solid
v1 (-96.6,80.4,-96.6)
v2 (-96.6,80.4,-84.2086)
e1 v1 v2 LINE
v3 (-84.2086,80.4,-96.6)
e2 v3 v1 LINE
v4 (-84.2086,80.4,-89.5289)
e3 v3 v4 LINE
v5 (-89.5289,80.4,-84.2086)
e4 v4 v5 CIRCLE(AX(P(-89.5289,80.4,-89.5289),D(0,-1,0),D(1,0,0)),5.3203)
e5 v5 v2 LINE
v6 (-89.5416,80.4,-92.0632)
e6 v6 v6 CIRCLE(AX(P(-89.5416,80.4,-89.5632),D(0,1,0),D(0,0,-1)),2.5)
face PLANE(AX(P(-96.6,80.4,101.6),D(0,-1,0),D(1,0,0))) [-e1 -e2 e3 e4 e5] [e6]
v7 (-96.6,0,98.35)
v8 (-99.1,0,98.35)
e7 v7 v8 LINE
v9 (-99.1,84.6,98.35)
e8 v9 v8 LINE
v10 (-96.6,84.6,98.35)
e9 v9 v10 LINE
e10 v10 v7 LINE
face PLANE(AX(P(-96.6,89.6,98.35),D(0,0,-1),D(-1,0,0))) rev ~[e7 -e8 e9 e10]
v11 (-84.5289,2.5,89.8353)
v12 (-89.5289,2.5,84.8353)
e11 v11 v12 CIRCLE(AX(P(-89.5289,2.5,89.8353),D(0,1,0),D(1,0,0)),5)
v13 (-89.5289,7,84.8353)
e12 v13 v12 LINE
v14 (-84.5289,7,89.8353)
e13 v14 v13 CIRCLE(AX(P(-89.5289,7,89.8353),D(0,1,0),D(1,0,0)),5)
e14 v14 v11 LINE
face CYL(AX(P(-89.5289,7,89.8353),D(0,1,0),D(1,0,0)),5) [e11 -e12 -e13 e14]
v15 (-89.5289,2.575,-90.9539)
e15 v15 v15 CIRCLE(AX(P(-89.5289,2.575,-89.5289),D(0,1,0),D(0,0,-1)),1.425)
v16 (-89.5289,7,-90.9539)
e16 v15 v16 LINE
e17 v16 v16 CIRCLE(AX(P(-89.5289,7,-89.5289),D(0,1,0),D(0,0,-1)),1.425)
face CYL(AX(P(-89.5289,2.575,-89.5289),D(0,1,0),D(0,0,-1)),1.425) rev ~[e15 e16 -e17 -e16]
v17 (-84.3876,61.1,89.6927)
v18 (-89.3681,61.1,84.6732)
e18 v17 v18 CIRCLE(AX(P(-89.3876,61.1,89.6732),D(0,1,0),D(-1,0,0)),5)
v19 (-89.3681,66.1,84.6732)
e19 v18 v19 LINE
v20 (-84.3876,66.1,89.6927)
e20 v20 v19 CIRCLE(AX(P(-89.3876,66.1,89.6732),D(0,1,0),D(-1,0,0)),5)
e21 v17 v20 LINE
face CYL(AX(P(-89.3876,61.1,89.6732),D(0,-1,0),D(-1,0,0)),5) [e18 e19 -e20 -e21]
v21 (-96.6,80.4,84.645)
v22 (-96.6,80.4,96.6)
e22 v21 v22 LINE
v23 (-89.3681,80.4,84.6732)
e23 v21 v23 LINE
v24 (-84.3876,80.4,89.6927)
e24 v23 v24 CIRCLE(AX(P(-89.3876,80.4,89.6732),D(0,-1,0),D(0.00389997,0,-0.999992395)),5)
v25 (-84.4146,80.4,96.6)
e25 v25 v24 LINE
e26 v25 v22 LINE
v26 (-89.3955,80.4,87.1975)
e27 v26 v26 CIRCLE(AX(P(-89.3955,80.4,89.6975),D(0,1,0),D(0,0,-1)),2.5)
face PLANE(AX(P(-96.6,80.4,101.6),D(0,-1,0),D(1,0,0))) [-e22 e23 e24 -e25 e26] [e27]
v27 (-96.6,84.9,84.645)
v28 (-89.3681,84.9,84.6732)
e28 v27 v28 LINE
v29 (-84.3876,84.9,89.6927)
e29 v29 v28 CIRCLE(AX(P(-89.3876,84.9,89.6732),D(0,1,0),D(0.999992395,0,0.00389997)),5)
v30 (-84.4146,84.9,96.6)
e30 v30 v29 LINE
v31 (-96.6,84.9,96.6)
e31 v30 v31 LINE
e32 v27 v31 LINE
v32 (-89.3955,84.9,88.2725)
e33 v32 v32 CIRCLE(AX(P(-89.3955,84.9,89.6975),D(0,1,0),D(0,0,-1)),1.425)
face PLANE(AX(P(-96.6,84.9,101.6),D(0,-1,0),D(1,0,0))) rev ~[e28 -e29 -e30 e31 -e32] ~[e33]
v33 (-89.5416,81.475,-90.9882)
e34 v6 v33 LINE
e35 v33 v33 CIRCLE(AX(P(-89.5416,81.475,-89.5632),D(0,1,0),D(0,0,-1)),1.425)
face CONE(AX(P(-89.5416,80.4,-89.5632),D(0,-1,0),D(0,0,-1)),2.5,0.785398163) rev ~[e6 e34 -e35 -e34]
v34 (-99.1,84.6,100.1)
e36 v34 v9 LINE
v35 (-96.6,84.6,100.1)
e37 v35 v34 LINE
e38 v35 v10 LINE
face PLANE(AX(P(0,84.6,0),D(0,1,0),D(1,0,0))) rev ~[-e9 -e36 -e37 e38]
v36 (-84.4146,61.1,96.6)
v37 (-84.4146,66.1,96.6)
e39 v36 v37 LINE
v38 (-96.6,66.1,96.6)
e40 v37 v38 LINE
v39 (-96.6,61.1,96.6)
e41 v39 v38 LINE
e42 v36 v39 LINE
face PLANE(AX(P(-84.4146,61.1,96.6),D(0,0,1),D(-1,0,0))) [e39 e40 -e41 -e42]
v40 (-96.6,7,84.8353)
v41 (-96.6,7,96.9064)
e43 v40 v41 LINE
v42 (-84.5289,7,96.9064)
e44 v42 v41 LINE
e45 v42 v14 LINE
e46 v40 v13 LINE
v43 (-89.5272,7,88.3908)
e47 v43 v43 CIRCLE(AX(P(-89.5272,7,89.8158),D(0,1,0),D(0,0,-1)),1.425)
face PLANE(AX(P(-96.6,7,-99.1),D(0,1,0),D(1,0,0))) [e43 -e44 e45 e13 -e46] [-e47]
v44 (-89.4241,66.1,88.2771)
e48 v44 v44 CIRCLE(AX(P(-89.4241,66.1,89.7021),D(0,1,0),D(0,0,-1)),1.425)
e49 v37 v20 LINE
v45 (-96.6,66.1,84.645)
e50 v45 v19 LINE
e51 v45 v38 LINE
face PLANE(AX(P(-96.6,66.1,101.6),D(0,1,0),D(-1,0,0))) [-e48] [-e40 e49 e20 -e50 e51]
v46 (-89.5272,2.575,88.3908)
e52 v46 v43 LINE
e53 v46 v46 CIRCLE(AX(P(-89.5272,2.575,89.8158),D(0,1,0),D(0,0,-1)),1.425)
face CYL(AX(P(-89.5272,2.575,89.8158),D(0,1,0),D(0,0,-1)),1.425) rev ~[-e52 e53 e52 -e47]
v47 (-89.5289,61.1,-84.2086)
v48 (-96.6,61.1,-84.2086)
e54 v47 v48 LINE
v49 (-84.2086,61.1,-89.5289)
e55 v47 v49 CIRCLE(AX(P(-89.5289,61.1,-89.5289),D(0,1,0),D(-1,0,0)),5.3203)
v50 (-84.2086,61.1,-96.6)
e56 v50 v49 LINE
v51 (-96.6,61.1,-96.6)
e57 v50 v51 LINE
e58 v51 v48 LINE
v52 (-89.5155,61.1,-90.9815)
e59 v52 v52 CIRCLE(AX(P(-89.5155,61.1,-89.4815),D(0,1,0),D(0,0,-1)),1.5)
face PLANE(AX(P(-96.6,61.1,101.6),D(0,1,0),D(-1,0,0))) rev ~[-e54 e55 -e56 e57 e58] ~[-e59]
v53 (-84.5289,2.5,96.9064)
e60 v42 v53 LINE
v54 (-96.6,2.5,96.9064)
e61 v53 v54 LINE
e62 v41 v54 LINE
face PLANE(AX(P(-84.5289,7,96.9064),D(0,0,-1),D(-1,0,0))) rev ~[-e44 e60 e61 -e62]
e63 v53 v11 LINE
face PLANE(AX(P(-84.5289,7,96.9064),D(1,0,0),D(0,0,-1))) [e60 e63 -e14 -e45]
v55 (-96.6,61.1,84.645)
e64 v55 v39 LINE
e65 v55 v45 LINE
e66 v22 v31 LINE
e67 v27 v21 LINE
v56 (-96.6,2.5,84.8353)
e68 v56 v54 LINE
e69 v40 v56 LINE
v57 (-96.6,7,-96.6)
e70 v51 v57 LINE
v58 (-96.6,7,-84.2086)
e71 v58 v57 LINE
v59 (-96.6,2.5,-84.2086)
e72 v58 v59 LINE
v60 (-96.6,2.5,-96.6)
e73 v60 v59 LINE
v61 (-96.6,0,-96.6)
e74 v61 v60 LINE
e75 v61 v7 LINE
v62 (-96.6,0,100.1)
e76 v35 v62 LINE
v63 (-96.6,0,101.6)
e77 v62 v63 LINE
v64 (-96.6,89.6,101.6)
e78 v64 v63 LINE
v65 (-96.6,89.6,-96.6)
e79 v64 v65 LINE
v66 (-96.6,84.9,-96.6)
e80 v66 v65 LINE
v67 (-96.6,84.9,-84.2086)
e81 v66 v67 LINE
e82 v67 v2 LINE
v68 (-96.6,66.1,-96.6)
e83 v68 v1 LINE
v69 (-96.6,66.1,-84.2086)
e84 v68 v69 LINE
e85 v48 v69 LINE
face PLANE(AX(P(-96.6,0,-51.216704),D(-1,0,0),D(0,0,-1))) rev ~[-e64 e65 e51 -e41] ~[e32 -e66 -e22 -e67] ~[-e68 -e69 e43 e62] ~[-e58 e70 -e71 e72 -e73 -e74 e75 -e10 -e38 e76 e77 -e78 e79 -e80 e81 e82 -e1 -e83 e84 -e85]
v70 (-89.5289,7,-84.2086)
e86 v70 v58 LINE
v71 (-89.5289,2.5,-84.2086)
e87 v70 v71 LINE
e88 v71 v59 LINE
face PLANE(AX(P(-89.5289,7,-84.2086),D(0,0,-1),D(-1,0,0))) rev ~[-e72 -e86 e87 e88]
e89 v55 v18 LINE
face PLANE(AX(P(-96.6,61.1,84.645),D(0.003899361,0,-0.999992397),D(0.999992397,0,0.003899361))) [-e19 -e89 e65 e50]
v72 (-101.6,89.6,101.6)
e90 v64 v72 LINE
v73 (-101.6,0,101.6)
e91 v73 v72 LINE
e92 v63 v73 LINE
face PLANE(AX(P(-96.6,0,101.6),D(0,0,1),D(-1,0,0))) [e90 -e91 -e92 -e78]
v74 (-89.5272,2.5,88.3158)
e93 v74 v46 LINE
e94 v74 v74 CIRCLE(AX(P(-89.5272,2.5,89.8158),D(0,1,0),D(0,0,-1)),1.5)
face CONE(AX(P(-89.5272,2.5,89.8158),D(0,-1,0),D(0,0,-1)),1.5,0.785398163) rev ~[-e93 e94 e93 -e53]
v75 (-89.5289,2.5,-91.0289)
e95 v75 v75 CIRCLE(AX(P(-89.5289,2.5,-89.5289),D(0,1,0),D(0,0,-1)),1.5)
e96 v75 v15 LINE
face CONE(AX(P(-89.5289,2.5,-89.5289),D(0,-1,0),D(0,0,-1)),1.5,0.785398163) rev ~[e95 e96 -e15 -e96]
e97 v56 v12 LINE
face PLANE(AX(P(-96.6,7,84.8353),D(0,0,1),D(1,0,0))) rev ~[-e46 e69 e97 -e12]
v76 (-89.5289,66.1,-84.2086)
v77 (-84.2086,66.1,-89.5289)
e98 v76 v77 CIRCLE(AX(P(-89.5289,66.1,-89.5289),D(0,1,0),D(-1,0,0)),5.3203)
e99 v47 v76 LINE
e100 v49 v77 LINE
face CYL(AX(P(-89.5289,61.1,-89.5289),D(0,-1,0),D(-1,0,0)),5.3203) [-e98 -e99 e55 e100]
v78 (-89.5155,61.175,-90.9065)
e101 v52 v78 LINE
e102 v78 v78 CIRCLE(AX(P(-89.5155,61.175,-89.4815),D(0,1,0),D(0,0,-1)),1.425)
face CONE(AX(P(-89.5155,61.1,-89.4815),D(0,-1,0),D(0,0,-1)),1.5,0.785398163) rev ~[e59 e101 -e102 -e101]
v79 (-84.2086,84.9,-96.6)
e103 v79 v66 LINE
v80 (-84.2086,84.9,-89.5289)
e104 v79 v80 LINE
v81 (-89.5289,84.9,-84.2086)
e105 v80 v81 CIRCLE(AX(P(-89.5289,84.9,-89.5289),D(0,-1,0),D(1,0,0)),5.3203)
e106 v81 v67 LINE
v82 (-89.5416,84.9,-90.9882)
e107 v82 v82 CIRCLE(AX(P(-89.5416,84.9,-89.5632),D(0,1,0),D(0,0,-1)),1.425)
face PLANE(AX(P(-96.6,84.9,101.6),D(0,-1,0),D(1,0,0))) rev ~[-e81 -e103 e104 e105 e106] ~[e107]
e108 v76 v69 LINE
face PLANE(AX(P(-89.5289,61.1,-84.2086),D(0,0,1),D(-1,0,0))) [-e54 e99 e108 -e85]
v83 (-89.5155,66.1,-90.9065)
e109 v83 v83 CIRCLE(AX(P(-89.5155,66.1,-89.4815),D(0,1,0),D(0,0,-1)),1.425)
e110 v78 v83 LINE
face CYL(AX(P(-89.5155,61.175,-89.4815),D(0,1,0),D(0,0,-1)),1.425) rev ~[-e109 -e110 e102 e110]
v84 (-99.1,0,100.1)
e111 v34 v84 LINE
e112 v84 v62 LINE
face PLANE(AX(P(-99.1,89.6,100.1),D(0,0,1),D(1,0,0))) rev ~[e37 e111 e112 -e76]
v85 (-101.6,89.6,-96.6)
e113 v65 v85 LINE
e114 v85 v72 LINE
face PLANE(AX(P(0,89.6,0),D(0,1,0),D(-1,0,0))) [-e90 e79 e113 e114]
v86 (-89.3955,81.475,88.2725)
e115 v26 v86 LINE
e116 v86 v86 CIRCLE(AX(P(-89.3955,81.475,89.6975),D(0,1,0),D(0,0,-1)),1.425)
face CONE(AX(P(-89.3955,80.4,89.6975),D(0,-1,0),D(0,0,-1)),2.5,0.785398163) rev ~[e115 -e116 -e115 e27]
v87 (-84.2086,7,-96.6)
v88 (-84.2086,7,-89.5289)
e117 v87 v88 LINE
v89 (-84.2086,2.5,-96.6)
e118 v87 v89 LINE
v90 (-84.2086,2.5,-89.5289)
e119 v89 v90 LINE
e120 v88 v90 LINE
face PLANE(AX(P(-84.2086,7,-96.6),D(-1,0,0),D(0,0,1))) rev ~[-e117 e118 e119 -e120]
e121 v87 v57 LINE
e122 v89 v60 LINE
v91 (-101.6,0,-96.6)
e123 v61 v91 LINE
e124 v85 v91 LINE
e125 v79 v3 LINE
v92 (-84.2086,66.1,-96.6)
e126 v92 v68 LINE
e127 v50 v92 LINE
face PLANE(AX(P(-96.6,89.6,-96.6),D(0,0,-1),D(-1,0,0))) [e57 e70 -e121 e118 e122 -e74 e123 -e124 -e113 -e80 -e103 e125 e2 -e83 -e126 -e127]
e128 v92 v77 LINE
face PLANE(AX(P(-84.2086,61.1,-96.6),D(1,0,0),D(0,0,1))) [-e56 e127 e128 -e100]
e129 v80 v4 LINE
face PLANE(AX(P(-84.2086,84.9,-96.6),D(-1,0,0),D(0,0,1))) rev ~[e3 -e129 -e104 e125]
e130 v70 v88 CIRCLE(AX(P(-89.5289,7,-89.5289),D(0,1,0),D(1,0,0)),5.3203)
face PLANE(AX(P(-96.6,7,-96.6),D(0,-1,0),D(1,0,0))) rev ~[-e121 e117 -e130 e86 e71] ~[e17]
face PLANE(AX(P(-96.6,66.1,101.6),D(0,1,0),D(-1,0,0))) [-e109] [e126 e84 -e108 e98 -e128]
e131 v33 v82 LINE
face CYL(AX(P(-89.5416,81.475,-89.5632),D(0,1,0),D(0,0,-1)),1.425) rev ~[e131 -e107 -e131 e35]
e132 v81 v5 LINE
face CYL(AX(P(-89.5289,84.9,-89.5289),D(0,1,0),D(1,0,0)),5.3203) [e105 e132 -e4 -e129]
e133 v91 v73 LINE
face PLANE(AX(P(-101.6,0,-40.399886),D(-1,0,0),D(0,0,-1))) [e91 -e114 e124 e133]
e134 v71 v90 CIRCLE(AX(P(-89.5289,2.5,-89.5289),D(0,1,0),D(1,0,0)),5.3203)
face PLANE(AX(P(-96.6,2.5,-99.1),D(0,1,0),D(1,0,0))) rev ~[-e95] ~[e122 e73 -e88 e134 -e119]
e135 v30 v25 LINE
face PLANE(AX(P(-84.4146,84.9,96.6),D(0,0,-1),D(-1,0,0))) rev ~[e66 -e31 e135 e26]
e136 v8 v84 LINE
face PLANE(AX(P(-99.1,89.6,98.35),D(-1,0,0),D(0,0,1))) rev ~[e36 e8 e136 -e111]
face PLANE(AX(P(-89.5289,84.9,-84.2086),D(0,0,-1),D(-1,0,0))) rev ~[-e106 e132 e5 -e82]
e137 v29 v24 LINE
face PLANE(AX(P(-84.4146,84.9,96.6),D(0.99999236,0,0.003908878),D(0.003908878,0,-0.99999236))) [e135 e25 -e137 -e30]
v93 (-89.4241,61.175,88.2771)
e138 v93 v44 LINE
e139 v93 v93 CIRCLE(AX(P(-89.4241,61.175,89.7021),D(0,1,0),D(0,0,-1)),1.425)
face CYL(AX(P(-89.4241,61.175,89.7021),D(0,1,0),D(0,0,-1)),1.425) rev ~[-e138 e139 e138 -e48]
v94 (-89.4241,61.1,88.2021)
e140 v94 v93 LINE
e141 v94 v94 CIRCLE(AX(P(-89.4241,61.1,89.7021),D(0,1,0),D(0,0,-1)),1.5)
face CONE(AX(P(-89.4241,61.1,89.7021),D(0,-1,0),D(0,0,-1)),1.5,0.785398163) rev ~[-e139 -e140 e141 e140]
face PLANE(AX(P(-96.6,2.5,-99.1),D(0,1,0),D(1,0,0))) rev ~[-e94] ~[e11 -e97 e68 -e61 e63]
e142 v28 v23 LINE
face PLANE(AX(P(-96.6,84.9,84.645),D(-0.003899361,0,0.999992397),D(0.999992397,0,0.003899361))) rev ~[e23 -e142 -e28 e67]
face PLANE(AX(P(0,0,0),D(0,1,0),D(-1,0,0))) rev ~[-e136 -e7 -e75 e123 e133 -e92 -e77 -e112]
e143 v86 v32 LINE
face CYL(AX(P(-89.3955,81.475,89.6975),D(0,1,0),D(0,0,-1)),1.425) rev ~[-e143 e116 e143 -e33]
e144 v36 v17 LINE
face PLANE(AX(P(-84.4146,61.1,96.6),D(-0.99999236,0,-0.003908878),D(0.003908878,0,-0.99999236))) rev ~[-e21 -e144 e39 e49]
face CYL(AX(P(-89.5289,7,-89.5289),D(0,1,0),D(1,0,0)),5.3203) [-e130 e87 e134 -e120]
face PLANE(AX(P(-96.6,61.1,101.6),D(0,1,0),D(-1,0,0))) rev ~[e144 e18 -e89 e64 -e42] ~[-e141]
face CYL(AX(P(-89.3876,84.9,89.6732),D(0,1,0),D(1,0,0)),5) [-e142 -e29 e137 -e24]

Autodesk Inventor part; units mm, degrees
ref_plane "YZ Plane" through (0, 0, 0) normal (1, 0, 0) x (0, 1, 0)
sketch "Sketch1" plane through (0, 0, 0) normal (0, 1, 0) x (-1, 0, 0)
  line L0 (101.6, -101.6) -> (-101.6, -101.6)
  line L1 (-101.6, -101.6) -> (-101.6, 101.6)
  line L2 (-101.6, 101.6) -> (101.6, 101.6)
  line L3 (101.6, 101.6) -> (101.6, -101.6)
  line L4 (96.6, -96.6) -> (-96.6, -96.6)
  line L5 (-96.6, -96.6) -> (-96.6, 96.6)
  line L6 (-96.6, 96.6) -> (96.6, 96.6)
  line L7 (96.6, 96.6) -> (96.6, -96.6)
  line L8 (101.6, 101.6) -> (-40.4, 101.6)
  circle A0 centre (0, 0) radius 88.9
  circle A1 centre (0, 0) radius 109.3376
  line L9 (-40.4, 101.6) -> (-101.6, 40.4)
  line L10 (-45.4, 101.6) -> (-101.6, 45.4)
  line L11 (96.6, 96.6) -> (96.6, 101.6)
  line L12 (-45.4, 101.6) -> (-35.4, 101.6)
  line L13 (-35.4, 101.6) -> (-35.4, 96.6)
  line L14 (-35.4, 96.6) -> (-45.4, 96.6)
  line L15 (-45.4, 96.6) -> (-45.4, 101.6)
  point P0 (96.6, 51.2168)
  point P1 (101.6, 40.4)
  point P2 (101.6, -40.4)
  point P3 (96.6, -51.2168)
  point P4 (-96.6, 45.4)
  point P5 (-45.4, 96.6)
  dimension "d0" = 203.2
  dimension "d1" = 203.2
  dimension "d2" = 101.6
  dimension "d3" = 101.6
  dimension "d4" = 5
  dimension "d5" = 5
  dimension "d6" = 5
  dimension "d7" = 5
  dimension "d10" = 142
  dimension "d12" = 61.2
  dimension "d14" = 177.8
  dimension "d15" = 5
  dimension "d16" = 5
  dimension "d17" = 10
extrude "Extrusion1" add sketch "Sketch1" along normal blind 89.6 contours L0 A1 L4 L7 L3 | L0 A1 L4 | A1 L7 L3 | L0 L1 A1 L5 L4 | A1 L7 L11 L2 L3 | L1 L9 L5 A1 | L1 L10 A1 | A1 L10 L5 L9 | L5 L10 L6 L9 | L6 L9 L2 L13 | L15 A1 L9 | L6 L10 A1 L15 | A1 L15 L2 | A1 L10 L15
sketch "Sketch2" plane through (101.6, 0, 45.4) normal (0.7071068, 0, 0.7071068) x (0.7071068, 0, -0.7071068)
  line L0 (-179.888, 0) -> (-39.7394, 0) projected
  line L1 (-74.4788, 0) -> (-5, 0)
  line L2 (-5, 0) -> (-5, 38.1)
  line L3 (-5, 38.1) -> (-74.4788, 38.1)
  line L4 (-74.4788, 38.1) -> (-74.4788, 0)
  line L5 (0, 0) -> (0, 89.6) projected
  line L6 (-79.4788, 0) -> (-79.4788, 89.6) projected
  arc A0 (-5, 38.1) -> (-74.4788, 38.1) centre (-39.7394, 10.3696) ccw
  point P0 (-39.7394, 0)
  dimension "d20" = 5
  dimension "d21" = 5
  dimension "d22" = 38.1
  dimension "d33" = 44.45
extrude "Extrusion2" cut sketch "Sketch2" along normal mid plane 98.6
fillet "Fillet1" radius 3.175 2 edges at (101.6, 44.8, 45.4) (45.4, 44.8, 101.6)
sketch "Sketch4" plane through (101.6, 0, -101.6) normal (1, 0, 0) x (0, 0, -1)
  line L0 (-145.6849, 0) -> (-145.6849, 89.6) projected
  line L1 (-203.2, 0) -> (-203.2, 89.6) projected
  line L2 (-145.6849, 0) -> (-203.2, 0)
  line L3 (-203.2, 0) -> (-203.2, 2)
  line L4 (-203.2, 2) -> (-145.6849, 2)
  line L5 (-145.6849, 2) -> (-145.6849, 0)
  point P0 (-101.6, 0)
  point P1 (-203.2, 0)
  dimension "d28" = 2
extrude "Extrusion3" cut sketch "Sketch4" against normal blind 57.658
fillet "Fillet3" radius 3.175 1 edges at (73.5, 54.8196, 73.5)
fillet "Fillet4" radius 3.175 2 edges at (48.9355, 20.05, 98.0645) (98.0645, 20.05, 48.9355)
sketch "Sketch5" plane through (-96.6, 0, -96.6) normal (0, 0, 1) x (1, 0, 0)
  line L0 (0, 0) -> (0, 89.6) projected
  line L1 (0, 0) -> (12.7, 0)
  line L2 (12.7, 0) -> (12.7, 19.7)
  line L3 (12.7, 19.7) -> (0, 19.7)
  line L4 (0, 19.7) -> (0, 0)
  line L5 (12.7, 0) -> (0, 0)
  line L6 (0, 0) -> (0, 7)
  line L7 (0, 7) -> (12.7, 7)
  line L8 (12.7, 7) -> (12.7, 0)
  point P0 (96.6, 0)
  point P1 (0, 7)
  point P2 (12.7, 7)
  point P3 (0, 19.7)
  dimension "d34" = 12.7
  dimension "d35" = 7
  dimension "d36" = 12.7
extrude "Extrusion4" cut sketch "Sketch5" against normal blind 25.4 contours L0 L3 L2 L7
ref_plane "Work Plane3" through (-96.6, 7, -99.1) normal (0, 1, 0) x (1, 0, 0)
sketch "Sketch11" plane through (-96.6, 7, -99.1) normal (0, 1, 0) x (1, 0, 0)
  line L0 (0, -2.5) -> (0, -196.0064)
  line L1 (193.2, -2.5) -> (0, -2.5)
  line L2 (0, -2.5) -> (193.2, -2.5)
  line L3 (193.2, -144.8203) -> (141.8746, -196.0064)
  line L4 (193.2, -2.5) -> (193.2, -144.8203)
  line L5 (193.2, -144.8203) -> (141.8746, -196.0064)
  line L6 (141.8746, -196.0064) -> (0, -196.0064)
  line L7 (0, -196.0064) -> (0, -2.5)
  line L8 (0, -2.5) -> (7.0711, -9.5711)
  circle A0 centre (7.0711, -9.5711) radius 5.3203
  circle A1 centre (7.0711, -9.5711) radius 1
  line L9 (7.0711, -14.8914) -> (0, -14.8914)
  line L10 (7.0711, -9.5711) -> (7.0711, -14.8914)
  line L11 (7.0711, -9.5711) -> (12.3914, -9.5711)
  line L12 (12.3914, -2.5) -> (12.3914, -9.5711)
  line L13 (0, -196.0064) -> (7.0711, -188.9353)
  line L14 (0, -196.0064) -> (10, -196.0064) construction
  circle A2 centre (7.0711, -188.9353) radius 5
  circle A3 centre (7.0711, -188.9353) radius 1
  line L15 (7.0711, -188.9353) -> (12.0711, -188.9353)
  line L16 (12.0711, -196.0064) -> (12.0711, -188.9353)
  line L17 (7.0711, -188.9353) -> (7.0711, -183.9353)
  line L18 (0, -183.9353) -> (7.0711, -183.9353)
  line L19 (193.2, -2.5) -> (186.1289, -9.5711)
  circle A4 centre (186.1289, -9.5711) radius 5
  circle A5 centre (186.1289, -9.5711) radius 1
  line L20 (186.1289, -9.5711) -> (181.1289, -9.5711)
  line L21 (181.1289, -2.5) -> (181.1289, -9.5711)
  line L22 (186.1289, -9.5711) -> (186.1289, -14.5711)
  line L23 (193.2, -14.5711) -> (186.1289, -14.5711)
  line L24 (193.2, -142.5343) -> (193.2, -2.5)
  line L25 (0, -196.0064) -> (139.7178, -196.0064)
  line L26 (122, -124.8064) -> (198.2, -124.8064)
  line L27 (198.2, -188.3064) -> (198.2, 2.1936)
  line L28 (122, -124.8064) -> (122, -201.0064)
  line L29 (139.7178, -201.0064) -> (-5, -201.0064)
  line L30 (193.2, -124.8064) -> (183.2, -124.8064)
  circle A6 centre (183.2, -124.8064) radius 5
  circle A7 centre (183.2, -124.8064) radius 1
  line L31 (122, -196.0064) -> (122, -186.0064)
  line L32 (193.2, -2.5) -> (193.2, -144.5) projected
  line L33 (0, -2.5) -> (193.2, -2.5) projected
  line L34 (0, -200.7) -> (0, -2.5) projected
  line L35 (183.2, -119.8064) -> (193.2, -119.8064)
  line L36 (183.2, -124.8064) -> (183.2, -129.8064)
  line L37 (183.2, -129.8064) -> (193.2, -129.8064)
  point P0 (96.6, -99.1)
  point P1 (96.4746, -327.7)
  point P2 (-5, -201.0064)
  point P3 (0, -183.9353)
  point P4 (0, -196.0064)
  point P5 (12.3914, -2.5)
  point P6 (0, -14.8914)
  dimension "d96" = 10
  dimension "d97" = 2
  dimension "d98" = 10
  dimension "d99" = 45
  dimension "d100" = 10
  dimension "d101" = 2
  dimension "d102" = 10
  dimension "d103" = 10
  dimension "d104" = 2
  dimension "d105" = 76.2
  dimension "d106" = 76.2
  dimension "d109" = 2
  dimension "d113" = 228.6
  dimension "d114" = 0
  dimension "d115" = 0
  dimension "d116" = 0
  dimension "d117" = 0
extrude "Extrusion8" add sketch "Sketch11" against normal blind 4.5 contours L8 A0 L9 L0 | L1 L12 A0 L8 | A0 L11 A1 L8 | L8 A1 L10 A0 | L18 A2 L13 L0 | L10 A1 L11 A0 | L1 L19 A4 L21 | L13 A2 L16 L6 | L17 A3 L13 A2 | A2 L15 A3 L17 | L4 L23 A4 L19 | L20 A5 L22 A4 | A4 L19 A5 L20 | L13 A3 L15 A2 | A4 L22 A5 L19 | L4 L26 A6 L35 | L4 L37 A6 L26 | A6 L26 A7 | A6 L36 A7 L26 | L26 A7 L36 A6
sketch "Sketch12" plane through (-101.6, 0, 101.6) normal (0, 0, 1) x (1, 0, 0)
  line L0 (0, 0) -> (5, 0) projected
  line L1 (5, 19.7) -> (5, 89.6) projected
  line L2 (0, 0) -> (5, 0)
  line L3 (5, 0) -> (5, 61.1)
  line L4 (5, 61.1) -> (0, 61.1)
  line L5 (0, 61.1) -> (0, 0)
  point P0 (101.6, 0)
  dimension "d120" = 61.1
ref_plane "Work Plane4" through (-96.6, 61.1, 101.6) normal (0, 1, 0) x (-1, 0, 0)
sketch "Sketch13" plane through (-96.6, 61.1, 101.6) normal (0, 1, 0) x (-1, 0, 0)
  line L0 (0, -198.2) -> (0, -5)
  line L1 (-193.2, -198.2) -> (0, -198.2)
  line L2 (0, -198.2) -> (-193.2, -198.2)
  line L3 (-193.2, -56.1861) -> (-141.8746, -5)
  line L4 (-193.2, -198.2) -> (-193.2, -56.1861)
  line L5 (-193.2, -56.1861) -> (-141.8746, -5)
  line L6 (-141.8746, -5) -> (0, -5)
  line L7 (0, -5) -> (0, -198.2)
  line L8 (0, -198.2) -> (-7.0711, -191.1289)
  circle A0 centre (-7.0711, -191.1289) radius 5.3203
  circle A1 centre (-7.0711, -191.1289) radius 1
  line L9 (-7.0711, -185.8086) -> (0, -185.8086)
  line L10 (-7.0711, -191.1289) -> (-7.0711, -185.8086)
  line L11 (-7.0711, -191.1289) -> (-12.3914, -191.1289)
  line L12 (-12.3914, -198.2) -> (-12.3914, -191.1289)
  line L13 (0, -5) -> (-7.2124, -11.9268)
  line L14 (0, -5) -> (-9.998, -4.7981) construction
  circle A2 centre (-7.2124, -11.9268) radius 5
  circle A3 centre (-7.2124, -11.9268) radius 1
  line L15 (-7.2124, -11.9268) -> (-12.2124, -11.9073)
  line L16 (-12.1854, -5) -> (-12.2124, -11.9073)
  line L17 (-7.2124, -11.9268) -> (-7.2319, -16.9268)
  line L18 (0, -16.955) -> (-7.2319, -16.9268)
  line L19 (-193.2, -198.2) -> (-186.1289, -191.1289)
  circle A4 centre (-186.1289, -191.1289) radius 5
  circle A5 centre (-186.1289, -191.1289) radius 1
  line L20 (-186.1289, -191.1289) -> (-181.1289, -191.1289)
  line L21 (-181.1289, -198.2) -> (-181.1289, -191.1289)
  line L22 (-186.1289, -191.1289) -> (-186.1289, -186.1289)
  line L23 (-193.2, -186.1289) -> (-186.1289, -186.1289)
  line L24 (-193.2, -58.1657) -> (-193.2, -198.2)
  line L25 (0, -5) -> (-139.7178, -5)
  line L26 (-122, -76.2) -> (-198.2, -76.2)
  line L27 (-198.2, -12.5257) -> (-198.2, -203.0257)
  line L28 (-122, -76.2) -> (-122, 0)
  line L29 (-139.8151, 0) -> (4.9027, 0)
  line L30 (-193.2, -76.2) -> (-183.2973, -76.2)
  circle A6 centre (-183.2973, -76.2) radius 5
  circle A7 centre (-183.2973, -76.2) radius 1
  line L31 (-122, -5) -> (-122, -15)
  circle A8 centre (-122, -15) radius 5
  circle A9 centre (-122, -15) radius 1.75
  line L32 (-193.2, -198.2) -> (-193.2, -56.2)
  line L33 (0, -198.2) -> (-193.2, -198.2)
  line L34 (0, -0.1321) -> (0, -198.2)
  line L35 (-183.2973, -81.2) -> (-193.2, -81.2)
  line L36 (-183.2973, -76.2) -> (-183.2973, -71.2)
  line L37 (-183.2973, -71.2) -> (-193.2, -71.2)
  line L38 (-122, -15) -> (-127, -15)
  line L39 (-127, -15) -> (-127, -5)
  line L40 (-117, -15) -> (-117, -5)
  line L41 (0, 0) -> (0, -198.2) projected
  line L42 (0, -198.2) -> (-193.2, -198.2) projected
  line L43 (-198.2, -57.5151) -> (-198.2, -203.2) projected
  line L44 (0, -4.6936) -> (-12.0711, -4.6936) projected
  line L45 (5, 0) -> (0, 0) projected
  line L46 (-142, -5) -> (-132, -5) projected
  point P0 (-96.6, -101.6)
  point P1 (-96.6973, -101.7321)
  point P2 (-139.7178, -5)
  point P3 (-139.8151, 0)
  point P4 (4.9027, 0)
  point P5 (181.1289, -2.5)
  point P6 (193.2, -129.8064)
  point P7 (193.2, -119.8064)
  point P8 (117, -196.0064)
  point P9 (127, -196.0064)
  point P10 (0, -183.9353)
  point P11 (0, -196.0064)
  point P12 (12.3914, -2.5)
  point P13 (0, -14.8914)
  point P14 (-193.2, -71.2)
  point P15 (-193.2, -81.2)
  point P16 (0, -16.955)
  point P17 (0, -5)
  point P18 (-12.3914, -198.2)
  point P19 (0, -185.8086)
  dimension "d122" = 10
  dimension "d123" = 2
  dimension "d124" = 10
  dimension "d125" = 45
  dimension "d126" = 10
  dimension "d127" = 2
  dimension "d128" = 10
  dimension "d129" = 10
  dimension "d130" = 2
  dimension "d131" = 76.2
  dimension "d132" = 76.2
  dimension "d133" = 2
  dimension "d134" = 10
  dimension "d135" = 10
  dimension "d136" = 3.5
  dimension "d138" = 0
  dimension "d139" = 0
  dimension "d140" = 0
  dimension "d141" = 0
  dimension "d142" = 0
  dimension "d143" = 0
  dimension "d144" = 0
  dimension "d146" = 0
  dimension "d148" = 0
extrude "Extrusion9" add sketch "Sketch13" along normal blind 5 contours L8 A0 L9 L0 | L1 L12 A0 L8 | A0 L11 A1 L8 | L8 A1 L10 A0 | L18 A2 L13 L0 | L10 A1 L11 A0 | L1 L19 A4 L21 | L13 A2 L16 L6 | L17 A3 L13 A2 | A2 L15 A3 L17 | L4 L23 A4 L19 | L20 A5 L22 A4 | A4 L19 A5 L20 | L13 A3 L15 A2 | A4 L22 A5 L19
sketch "Sketch14" plane through (-101.6, 0, 101.6) normal (0, 0, 1) x (1, 0, 0)
  line L0 (12.2319, 61.1) -> (5, 61.1) projected
  line L1 (5, 62) -> (5, 84.9)
  line L2 (5, 0) -> (5, 89.6) projected
  line L3 (5, 84.9) -> (137, 84.9)
  line L4 (137, 0) -> (137, 89.6) projected
  point P0 (101.6, 0)
  point P1 (5, 61.1)
  dimension "d151" = 22.9
ref_plane "Work Plane5" through (-96.6, 84.9, 101.6) normal (0, -1, 0) x (1, 0, 0)
sketch "Sketch15" plane through (-96.6, 84.9, 101.6) normal (0, -1, 0) x (1, 0, 0)
  line L0 (0, -198.2) -> (0, -5)
  line L1 (-193.2, -198.2) -> (0, -198.2)
  line L2 (0, -198.2) -> (-193.2, -198.2)
  line L3 (-193.2, -56.1861) -> (-141.8746, -5)
  line L4 (-193.2, -198.2) -> (-193.2, -56.1861)
  line L5 (-193.2, -56.1861) -> (-141.8746, -5)
  line L6 (-141.8746, -5) -> (0, -5)
  line L7 (0, -5) -> (0, -198.2)
  line L8 (0, -198.2) -> (-7.0711, -191.1289)
  circle A0 centre (-7.0711, -191.1289) radius 5.3203
  circle A1 centre (-7.0711, -191.1289) radius 1
  line L9 (-7.0711, -185.8086) -> (0, -185.8086)
  line L10 (-7.0711, -191.1289) -> (-7.0711, -185.8086)
  line L11 (-7.0711, -191.1289) -> (-12.3914, -191.1289)
  line L12 (-12.3914, -198.2) -> (-12.3914, -191.1289)
  line L13 (0, -5) -> (-7.2124, -11.9268)
  line L14 (0, -5) -> (-9.998, -4.7981) construction
  circle A2 centre (-7.2124, -11.9268) radius 5
  circle A3 centre (-7.2124, -11.9268) radius 1
  line L15 (-7.2124, -11.9268) -> (-12.2124, -11.9073)
  line L16 (-12.1854, -5) -> (-12.2124, -11.9073)
  line L17 (-7.2124, -11.9268) -> (-7.2319, -16.9268)
  line L18 (0, -16.955) -> (-7.2319, -16.9268)
  line L19 (-193.2, -198.2) -> (-186.1289, -191.1289)
  circle A4 centre (-186.1289, -191.1289) radius 5
  circle A5 centre (-186.1289, -191.1289) radius 1
  line L20 (-186.1289, -191.1289) -> (-181.1289, -191.1289)
  line L21 (-181.1289, -198.2) -> (-181.1289, -191.1289)
  line L22 (-186.1289, -191.1289) -> (-186.1289, -186.1289)
  line L23 (-193.2, -186.1289) -> (-186.1289, -186.1289)
  line L24 (-193.2, -58.1657) -> (-193.2, -198.2)
  line L25 (0, -5) -> (-139.7178, -5)
  line L26 (-122, -76.2) -> (-198.2, -76.2)
  line L27 (-198.2, -12.5257) -> (-198.2, -203.0257)
  line L28 (-122, -76.2) -> (-122, 0)
  line L29 (-139.8151, 0) -> (4.9027, 0)
  line L30 (-193.2, -76.2) -> (-183.2973, -76.2)
  circle A6 centre (-183.2973, -76.2) radius 5
  circle A7 centre (-183.2973, -76.2) radius 1
  line L31 (-122, -5) -> (-122, -15)
  circle A8 centre (-122, -15) radius 5
  circle A9 centre (-122, -15) radius 1.75
  line L32 (-193.2, -198.2) -> (-193.2, -56.2)
  line L33 (0, -198.2) -> (-193.2, -198.2)
  line L34 (0, -0.1321) -> (0, -198.2)
  line L35 (-183.2973, -81.2) -> (-193.2, -81.2)
  line L36 (-183.2973, -76.2) -> (-183.2973, -71.2)
  line L37 (-183.2973, -71.2) -> (-193.2, -71.2)
  line L38 (-122, -15) -> (-127, -15)
  line L39 (-127, -15) -> (-127, -5)
  line L40 (-117, -15) -> (-117, -5)
  line L41 (0, 0) -> (0, -198.2)
  line L42 (0, -198.2) -> (-193.2, -198.2)
  line L43 (-198.2, -57.5151) -> (-198.2, -203.2)
  line L44 (0, -4.6936) -> (-12.0711, -4.6936)
  line L45 (5, 0) -> (0, 0)
  line L46 (-142, -5) -> (-132, -5)
  line L47 (193.2, -198.2) -> (0, -198.2)
  line L48 (0, -198.2) -> (193.2, -198.2)
  line L49 (193.2, -56.1861) -> (141.8746, -5)
  line L50 (193.2, -198.2) -> (193.2, -56.1861)
  line L51 (193.2, -56.1861) -> (141.8746, -5)
  line L52 (141.8746, -5) -> (0, -5)
  line L53 (0, -198.2) -> (7.0711, -191.1289)
  circle A10 centre (7.0711, -191.1289) radius 5.3203
  circle A11 centre (7.0711, -191.1289) radius 1
  line L54 (7.0711, -185.8086) -> (0, -185.8086)
  line L55 (7.0711, -191.1289) -> (7.0711, -185.8086)
  line L56 (7.0711, -191.1289) -> (12.3914, -191.1289)
  line L57 (12.3914, -198.2) -> (12.3914, -191.1289)
  line L58 (0, -5) -> (7.2124, -11.9268)
  line L59 (0, -5) -> (9.998, -4.7981) construction
  circle A12 centre (7.2124, -11.9268) radius 5
  circle A13 centre (7.2124, -11.9268) radius 1
  line L60 (7.2124, -11.9268) -> (12.2124, -11.9073)
  line L61 (12.1854, -5) -> (12.2124, -11.9073)
  line L62 (7.2124, -11.9268) -> (7.2319, -16.9268)
  line L63 (0, -16.955) -> (7.2319, -16.9268)
  line L64 (193.2, -198.2) -> (186.1289, -191.1289)
  circle A14 centre (186.1289, -191.1289) radius 5
  circle A15 centre (186.1289, -191.1289) radius 1
  line L65 (186.1289, -191.1289) -> (181.1289, -191.1289)
  line L66 (181.1289, -198.2) -> (181.1289, -191.1289)
  line L67 (186.1289, -191.1289) -> (186.1289, -186.1289)
  line L68 (193.2, -186.1289) -> (186.1289, -186.1289)
  line L69 (193.2, -58.1657) -> (193.2, -198.2)
  line L70 (0, -5) -> (139.7178, -5)
  line L71 (122, -76.2) -> (198.2, -76.2)
  line L72 (198.2, -12.5257) -> (198.2, -203.0257)
  line L73 (122, -76.2) -> (122, 0)
  line L74 (139.8151, 0) -> (-4.9027, 0)
  line L75 (122, -5) -> (122, -15)
  circle A16 centre (122, -15) radius 5
  circle A17 centre (122, -15) radius 1.75
  line L76 (193.2, -198.2) -> (193.2, -56.2)
  line L77 (0, -198.2) -> (193.2, -198.2)
  line L78 (122, -15) -> (127, -15)
  line L79 (127, -15) -> (127, -5)
  line L80 (117, -15) -> (117, -5)
  line L81 (0, -198.2) -> (193.2, -198.2)
  line L82 (198.2, -57.5151) -> (198.2, -203.2)
  line L83 (0, -4.6936) -> (12.0711, -4.6936)
  line L84 (-5, 0) -> (0, 0)
  line L85 (142, -5) -> (132, -5)
  line L86 (193.2, -56.2) -> (142, -5) projected
  line L87 (142, -5) -> (193.2, -56.2)
  line L88 (142, -5) -> (142, -11.9268)
  line L89 (142, -11.9268) -> (186.2732, -56.2)
  line L90 (193.2, -57.5151) -> (193.2, -56.2) projected
  line L91 (186.2732, -56.2) -> (193.2, -56.2)
  circle A18 centre (165.7974, -32.3329) radius 1
  point P0 (96.6, -101.6)
  point P1 (-96.6, -101.6)
  point P2 (-96.6973, -101.7321)
  point P3 (-139.7178, -5)
  point P4 (-139.8151, 0)
  point P5 (4.9027, 0)
  point P6 (181.1289, -2.5)
  point P7 (193.2, -129.8064)
  point P8 (193.2, -119.8064)
  point P9 (117, -196.0064)
  point P10 (127, -196.0064)
  point P11 (0, -183.9353)
  point P12 (0, -196.0064)
  point P13 (12.3914, -2.5)
  point P14 (0, -14.8914)
  point P15 (-193.2, -71.2)
  point P16 (-193.2, -81.2)
  point P17 (0, -16.955)
  point P18 (0, -5)
  point P19 (-12.3914, -198.2)
  point P20 (0, -185.8086)
  point P21 (96.6, -101.6)
  point P22 (96.6973, -101.7321)
  point P23 (139.7178, -5)
  point P24 (139.8151, 0)
  point P25 (-4.9027, 0)
  point P26 (0, -16.955)
  point P27 (0, -185.8086)
  point P28 (12.3914, -198.2)
  point P29 (188.0675, -51.0675)
  point P30 (142, -5.1251)
  dimension "d153" = 10
  dimension "d154" = 2
  dimension "d155" = 10
  dimension "d156" = 45
  dimension "d157" = 10
  dimension "d158" = 2
  dimension "d159" = 10
  dimension "d160" = 10
  dimension "d161" = 2
  dimension "d162" = 76.2
  dimension "d163" = 76.2
  dimension "d164" = 2
  dimension "d165" = 10
  dimension "d166" = 10
  dimension "d167" = 3.5
  dimension "d168" = 0
  dimension "d169" = 0
  dimension "d170" = 0
  dimension "d171" = 0
  dimension "d172" = 0
  dimension "d173" = 0
  dimension "d174" = 0
  dimension "d175" = 0
  dimension "d176" = 0
  dimension "d179" = 0.3064
  dimension "d210" = 2
  dimension "d211" = 2.5
extrude "Extrusion10" add sketch "Sketch15" along normal blind 4.5 contours L53 A10 L57 L47 | L0 L54 A10 L53 | A10 L55 A11 L53 | L53 A11 L56 A10 | L0 L58 A12 L63 | A10 L56 A11 L55 | L66 A14 L64 L47 | L52 L61 A12 L58 | L62 A13 L60 A12 | A12 L58 A13 L62 | L64 A14 L68 L50 | L65 A15 L64 A14 | A14 L67 A15 L65 | A12 L60 A13 L58 | L64 A15 L67 A14 | L91 L89 L88 L49 L86 | L49 L88 L86
fillet "Fillet5" radius 3.175 2 edges at (101.6, 44.8, -101.6) (-101.6, 44.8, -101.6)
sketch "Sketch16" plane through (0, 89.6, 0) normal (0, 1, 0) x (1, 0, 0)
  line L0 (-96.6, -101.6) -> (-96.6, 96.6) projected
  line L1 (-96.6, -98.35) -> (-99.1, -98.35)
  line L2 (-99.1, -98.35) -> (-99.1, -100.1)
  line L3 (-99.1, -100.1) -> (-96.6, -100.1)
  line L4 (-96.6, -100.1) -> (-96.6, -98.35)
  line L5 (-101.6, -101.6) -> (-96.6, -101.6) projected
  line L6 (35.4, -96.6) -> (35.4, -101.6) projected
  line L7 (35.4, -100.1) -> (37.9, -100.1)
  line L8 (37.9, -100.1) -> (37.9, -98.35)
  line L9 (37.9, -98.35) -> (35.4, -98.35)
  line L10 (35.4, -98.35) -> (35.4, -100.1)
  line L11 (35.4, -101.6) -> (44.0849, -101.6) projected
  line L12 (45.4, -96.6) -> (35.4, -96.6) projected
  line L13 (-96.6, -100.1) -> (35.4, -100.1)
  line L14 (-101.6, 98.425) -> (-101.6, -101.6) projected
  point P0 (0, 0)
  dimension "d182" = 1.5
  dimension "d183" = 1.75
  dimension "d184" = 2.5
  dimension "d185" = 1.5
  dimension "d186" = 1.75
  dimension "d187" = 2.5
  dimension "d188" = 1.75
  dimension "d191" = 132
  dimension "d194" = 2.5
extrude "Extrusion11" cut sketch "Sketch16" against normal through all
sketch "Sketch17" plane through (0, 0, 0) normal (0, -1, 0) x (1, 0, 0)
  point P0 (0, 0)
sketch "Sketch18" plane through (0, 89.6, 0) normal (0, 1, 0) x (1, 0, 0)
  line L0 (45.4, -96.6) -> (35.4, -96.6) projected
  line L1 (35.4, -101.6) -> (44.0849, -101.6) projected
  line L2 (35.4, -96.6) -> (39.0179, -96.6)
  line L3 (39.0179, -96.6) -> (39.0179, -101.6)
  line L4 (39.0179, -101.6) -> (35.4, -101.6)
  line L5 (35.4, -101.6) -> (35.4, -96.6)
  line L6 (-101.6, 98.425) -> (-101.6, -101.6) projected
  line L7 (-96.6, -101.6) -> (-96.6, -100.1) projected
  line L8 (-101.6, -96.6) -> (-96.6, -96.6)
  line L9 (-96.6, -96.6) -> (-96.6, -101.6)
  line L10 (-96.6, -101.6) -> (-101.6, -101.6)
  line L11 (-101.6, -101.6) -> (-101.6, -96.6)
  point P0 (0, 0)
  point P1 (-101.6, -101.6)
extrude "Extrusion12" add sketch "Sketch18" against normal blind 5
sketch "Sketch22" plane through (-96.6, 61.1, 101.6) normal (0, -1, 0) x (1, 0, 0)
  circle A0 centre (7.1759, -11.8979) radius 1.0267
  circle A1 centre (7.0845, -191.0815) radius 1.099
  circle A2 centre (186.1548, -191.1698) radius 1.0412
  point P0 (96.6, -101.6)
hole "Hole1" at (-89.4241, 61.1, 89.7021) at (-89.5155, 61.1, -89.4815) at (89.5548, 61.1, -89.5698) direction (0, 1, 0) diameter 2.85 depth 12.7 tip angle 118 countersink diameter 3 countersink angle 90 thread size "M3.5x0.6" class "6H" standard "ANSI Metric M Profile"
sketch "Sketch23" plane through (-96.6, 2.5, -99.1) normal (0, -1, 0) x (1, 0, 0)
  point P0 (96.6, 99.1)
sketch "Sketch24" plane through (-96.6, 2.5, -99.1) normal (0, -1, 0) x (1, 0, 0)
  circle A0 centre (7.0728, 188.9158) radius 1.0195
  circle A1 centre (7.0711, 9.5711) radius 1 projected
  circle A2 centre (7.0711, 9.5711) radius 1
  circle A3 centre (186.0543, 9.5711) radius 1.0028
  circle A4 centre (183.1847, 124.8098) radius 1.0762
  point P0 (96.6, 99.1)
hole "Hole2" at (-89.5272, 2.5, 89.8158) at (-89.5289, 2.5, -89.5289) at (89.4543, 2.5, -89.5289) at (86.5847, 2.5, 25.7098) direction (0, 1, 0) diameter 2.85 depth 12.7 tip angle 118 countersink diameter 3 countersink angle 90 thread size "M3.5x0.6" class "6H" standard "ANSI Metric M Profile"
sketch "Sketch25" plane through (-96.6, 80.4, 101.6) normal (0, -1, 0) x (1, 0, 0)
  circle A0 centre (7.2045, -11.9025) radius 1.0659
  circle A1 centre (7.0584, -191.1632) radius 1.0343
  circle A2 centre (186.0543, -191.1289) radius 1.5 projected
  circle A3 centre (186.0543, -191.1289) radius 1.0077
  circle A4 centre (183.0986, -75.9599) radius 1.4972
  circle A5 centre (165.7974, -32.3329) radius 1 projected
  circle A6 centre (165.7974, -32.3329) radius 1
  point P0 (96.6, -101.6)
hole "Hole3" at (69.1974, 80.4, 69.2671) at (86.4986, 80.4, 25.6401) at (89.4543, 80.4, -89.5289) at (-89.5416, 80.4, -89.5632) at (-89.3955, 80.4, 89.6975) direction (0, 1, 0) diameter 2.85 depth 12.7 tip angle 118 countersink diameter 5 countersink angle 90 thread size "M3.5x0.6" class "6H" standard "ANSI Metric M Profile"
sketch "Sketch26" plane through (0, 89.6, 0) normal (0, 1, 0) x (1, 0, 0)
  line L0 (101.6, -44.0849) -> (101.6, 98.425) projected
  line L1 (-101.6, 101.6) -> (101.6, 101.6)
  line L2 (101.6, 101.6) -> (101.6, 96.7077)
  line L3 (-101.6, 96.7077) -> (-101.6, 101.6)
  line L4 (-96.6, -101.6) -> (-96.6, 96.6) projected
  line L5 (-96.6, 96.6) -> (-102.5248, 96.6)
  line L6 (-102.5248, 96.6) -> (-102.5248, 104.7053)
  line L7 (-102.5248, 104.7053) -> (114.3325, 104.7053)
  line L8 (114.3325, 104.7053) -> (114.3325, -117.7606)
  line L9 (114.3325, -117.7606) -> (-73.8754, -117.7606)
  line L10 (-73.8754, -117.7606) -> (-77.4939, 96.6)
  line L11 (-96.6, 96.6) -> (96.6, 96.6) projected
  line L12 (-96.6, 96.6) -> (-77.4939, 96.6)
  point P0 (0, 0)
extrude "Extrusion13" cut sketch "Sketch26" against normal through all
equation "\"d1\" = d0"
equation "\"d2\" = 0.5 * d0"
equation "\"d3\" = 0.5 * d0"
properties part number "Box_Walls_2"
